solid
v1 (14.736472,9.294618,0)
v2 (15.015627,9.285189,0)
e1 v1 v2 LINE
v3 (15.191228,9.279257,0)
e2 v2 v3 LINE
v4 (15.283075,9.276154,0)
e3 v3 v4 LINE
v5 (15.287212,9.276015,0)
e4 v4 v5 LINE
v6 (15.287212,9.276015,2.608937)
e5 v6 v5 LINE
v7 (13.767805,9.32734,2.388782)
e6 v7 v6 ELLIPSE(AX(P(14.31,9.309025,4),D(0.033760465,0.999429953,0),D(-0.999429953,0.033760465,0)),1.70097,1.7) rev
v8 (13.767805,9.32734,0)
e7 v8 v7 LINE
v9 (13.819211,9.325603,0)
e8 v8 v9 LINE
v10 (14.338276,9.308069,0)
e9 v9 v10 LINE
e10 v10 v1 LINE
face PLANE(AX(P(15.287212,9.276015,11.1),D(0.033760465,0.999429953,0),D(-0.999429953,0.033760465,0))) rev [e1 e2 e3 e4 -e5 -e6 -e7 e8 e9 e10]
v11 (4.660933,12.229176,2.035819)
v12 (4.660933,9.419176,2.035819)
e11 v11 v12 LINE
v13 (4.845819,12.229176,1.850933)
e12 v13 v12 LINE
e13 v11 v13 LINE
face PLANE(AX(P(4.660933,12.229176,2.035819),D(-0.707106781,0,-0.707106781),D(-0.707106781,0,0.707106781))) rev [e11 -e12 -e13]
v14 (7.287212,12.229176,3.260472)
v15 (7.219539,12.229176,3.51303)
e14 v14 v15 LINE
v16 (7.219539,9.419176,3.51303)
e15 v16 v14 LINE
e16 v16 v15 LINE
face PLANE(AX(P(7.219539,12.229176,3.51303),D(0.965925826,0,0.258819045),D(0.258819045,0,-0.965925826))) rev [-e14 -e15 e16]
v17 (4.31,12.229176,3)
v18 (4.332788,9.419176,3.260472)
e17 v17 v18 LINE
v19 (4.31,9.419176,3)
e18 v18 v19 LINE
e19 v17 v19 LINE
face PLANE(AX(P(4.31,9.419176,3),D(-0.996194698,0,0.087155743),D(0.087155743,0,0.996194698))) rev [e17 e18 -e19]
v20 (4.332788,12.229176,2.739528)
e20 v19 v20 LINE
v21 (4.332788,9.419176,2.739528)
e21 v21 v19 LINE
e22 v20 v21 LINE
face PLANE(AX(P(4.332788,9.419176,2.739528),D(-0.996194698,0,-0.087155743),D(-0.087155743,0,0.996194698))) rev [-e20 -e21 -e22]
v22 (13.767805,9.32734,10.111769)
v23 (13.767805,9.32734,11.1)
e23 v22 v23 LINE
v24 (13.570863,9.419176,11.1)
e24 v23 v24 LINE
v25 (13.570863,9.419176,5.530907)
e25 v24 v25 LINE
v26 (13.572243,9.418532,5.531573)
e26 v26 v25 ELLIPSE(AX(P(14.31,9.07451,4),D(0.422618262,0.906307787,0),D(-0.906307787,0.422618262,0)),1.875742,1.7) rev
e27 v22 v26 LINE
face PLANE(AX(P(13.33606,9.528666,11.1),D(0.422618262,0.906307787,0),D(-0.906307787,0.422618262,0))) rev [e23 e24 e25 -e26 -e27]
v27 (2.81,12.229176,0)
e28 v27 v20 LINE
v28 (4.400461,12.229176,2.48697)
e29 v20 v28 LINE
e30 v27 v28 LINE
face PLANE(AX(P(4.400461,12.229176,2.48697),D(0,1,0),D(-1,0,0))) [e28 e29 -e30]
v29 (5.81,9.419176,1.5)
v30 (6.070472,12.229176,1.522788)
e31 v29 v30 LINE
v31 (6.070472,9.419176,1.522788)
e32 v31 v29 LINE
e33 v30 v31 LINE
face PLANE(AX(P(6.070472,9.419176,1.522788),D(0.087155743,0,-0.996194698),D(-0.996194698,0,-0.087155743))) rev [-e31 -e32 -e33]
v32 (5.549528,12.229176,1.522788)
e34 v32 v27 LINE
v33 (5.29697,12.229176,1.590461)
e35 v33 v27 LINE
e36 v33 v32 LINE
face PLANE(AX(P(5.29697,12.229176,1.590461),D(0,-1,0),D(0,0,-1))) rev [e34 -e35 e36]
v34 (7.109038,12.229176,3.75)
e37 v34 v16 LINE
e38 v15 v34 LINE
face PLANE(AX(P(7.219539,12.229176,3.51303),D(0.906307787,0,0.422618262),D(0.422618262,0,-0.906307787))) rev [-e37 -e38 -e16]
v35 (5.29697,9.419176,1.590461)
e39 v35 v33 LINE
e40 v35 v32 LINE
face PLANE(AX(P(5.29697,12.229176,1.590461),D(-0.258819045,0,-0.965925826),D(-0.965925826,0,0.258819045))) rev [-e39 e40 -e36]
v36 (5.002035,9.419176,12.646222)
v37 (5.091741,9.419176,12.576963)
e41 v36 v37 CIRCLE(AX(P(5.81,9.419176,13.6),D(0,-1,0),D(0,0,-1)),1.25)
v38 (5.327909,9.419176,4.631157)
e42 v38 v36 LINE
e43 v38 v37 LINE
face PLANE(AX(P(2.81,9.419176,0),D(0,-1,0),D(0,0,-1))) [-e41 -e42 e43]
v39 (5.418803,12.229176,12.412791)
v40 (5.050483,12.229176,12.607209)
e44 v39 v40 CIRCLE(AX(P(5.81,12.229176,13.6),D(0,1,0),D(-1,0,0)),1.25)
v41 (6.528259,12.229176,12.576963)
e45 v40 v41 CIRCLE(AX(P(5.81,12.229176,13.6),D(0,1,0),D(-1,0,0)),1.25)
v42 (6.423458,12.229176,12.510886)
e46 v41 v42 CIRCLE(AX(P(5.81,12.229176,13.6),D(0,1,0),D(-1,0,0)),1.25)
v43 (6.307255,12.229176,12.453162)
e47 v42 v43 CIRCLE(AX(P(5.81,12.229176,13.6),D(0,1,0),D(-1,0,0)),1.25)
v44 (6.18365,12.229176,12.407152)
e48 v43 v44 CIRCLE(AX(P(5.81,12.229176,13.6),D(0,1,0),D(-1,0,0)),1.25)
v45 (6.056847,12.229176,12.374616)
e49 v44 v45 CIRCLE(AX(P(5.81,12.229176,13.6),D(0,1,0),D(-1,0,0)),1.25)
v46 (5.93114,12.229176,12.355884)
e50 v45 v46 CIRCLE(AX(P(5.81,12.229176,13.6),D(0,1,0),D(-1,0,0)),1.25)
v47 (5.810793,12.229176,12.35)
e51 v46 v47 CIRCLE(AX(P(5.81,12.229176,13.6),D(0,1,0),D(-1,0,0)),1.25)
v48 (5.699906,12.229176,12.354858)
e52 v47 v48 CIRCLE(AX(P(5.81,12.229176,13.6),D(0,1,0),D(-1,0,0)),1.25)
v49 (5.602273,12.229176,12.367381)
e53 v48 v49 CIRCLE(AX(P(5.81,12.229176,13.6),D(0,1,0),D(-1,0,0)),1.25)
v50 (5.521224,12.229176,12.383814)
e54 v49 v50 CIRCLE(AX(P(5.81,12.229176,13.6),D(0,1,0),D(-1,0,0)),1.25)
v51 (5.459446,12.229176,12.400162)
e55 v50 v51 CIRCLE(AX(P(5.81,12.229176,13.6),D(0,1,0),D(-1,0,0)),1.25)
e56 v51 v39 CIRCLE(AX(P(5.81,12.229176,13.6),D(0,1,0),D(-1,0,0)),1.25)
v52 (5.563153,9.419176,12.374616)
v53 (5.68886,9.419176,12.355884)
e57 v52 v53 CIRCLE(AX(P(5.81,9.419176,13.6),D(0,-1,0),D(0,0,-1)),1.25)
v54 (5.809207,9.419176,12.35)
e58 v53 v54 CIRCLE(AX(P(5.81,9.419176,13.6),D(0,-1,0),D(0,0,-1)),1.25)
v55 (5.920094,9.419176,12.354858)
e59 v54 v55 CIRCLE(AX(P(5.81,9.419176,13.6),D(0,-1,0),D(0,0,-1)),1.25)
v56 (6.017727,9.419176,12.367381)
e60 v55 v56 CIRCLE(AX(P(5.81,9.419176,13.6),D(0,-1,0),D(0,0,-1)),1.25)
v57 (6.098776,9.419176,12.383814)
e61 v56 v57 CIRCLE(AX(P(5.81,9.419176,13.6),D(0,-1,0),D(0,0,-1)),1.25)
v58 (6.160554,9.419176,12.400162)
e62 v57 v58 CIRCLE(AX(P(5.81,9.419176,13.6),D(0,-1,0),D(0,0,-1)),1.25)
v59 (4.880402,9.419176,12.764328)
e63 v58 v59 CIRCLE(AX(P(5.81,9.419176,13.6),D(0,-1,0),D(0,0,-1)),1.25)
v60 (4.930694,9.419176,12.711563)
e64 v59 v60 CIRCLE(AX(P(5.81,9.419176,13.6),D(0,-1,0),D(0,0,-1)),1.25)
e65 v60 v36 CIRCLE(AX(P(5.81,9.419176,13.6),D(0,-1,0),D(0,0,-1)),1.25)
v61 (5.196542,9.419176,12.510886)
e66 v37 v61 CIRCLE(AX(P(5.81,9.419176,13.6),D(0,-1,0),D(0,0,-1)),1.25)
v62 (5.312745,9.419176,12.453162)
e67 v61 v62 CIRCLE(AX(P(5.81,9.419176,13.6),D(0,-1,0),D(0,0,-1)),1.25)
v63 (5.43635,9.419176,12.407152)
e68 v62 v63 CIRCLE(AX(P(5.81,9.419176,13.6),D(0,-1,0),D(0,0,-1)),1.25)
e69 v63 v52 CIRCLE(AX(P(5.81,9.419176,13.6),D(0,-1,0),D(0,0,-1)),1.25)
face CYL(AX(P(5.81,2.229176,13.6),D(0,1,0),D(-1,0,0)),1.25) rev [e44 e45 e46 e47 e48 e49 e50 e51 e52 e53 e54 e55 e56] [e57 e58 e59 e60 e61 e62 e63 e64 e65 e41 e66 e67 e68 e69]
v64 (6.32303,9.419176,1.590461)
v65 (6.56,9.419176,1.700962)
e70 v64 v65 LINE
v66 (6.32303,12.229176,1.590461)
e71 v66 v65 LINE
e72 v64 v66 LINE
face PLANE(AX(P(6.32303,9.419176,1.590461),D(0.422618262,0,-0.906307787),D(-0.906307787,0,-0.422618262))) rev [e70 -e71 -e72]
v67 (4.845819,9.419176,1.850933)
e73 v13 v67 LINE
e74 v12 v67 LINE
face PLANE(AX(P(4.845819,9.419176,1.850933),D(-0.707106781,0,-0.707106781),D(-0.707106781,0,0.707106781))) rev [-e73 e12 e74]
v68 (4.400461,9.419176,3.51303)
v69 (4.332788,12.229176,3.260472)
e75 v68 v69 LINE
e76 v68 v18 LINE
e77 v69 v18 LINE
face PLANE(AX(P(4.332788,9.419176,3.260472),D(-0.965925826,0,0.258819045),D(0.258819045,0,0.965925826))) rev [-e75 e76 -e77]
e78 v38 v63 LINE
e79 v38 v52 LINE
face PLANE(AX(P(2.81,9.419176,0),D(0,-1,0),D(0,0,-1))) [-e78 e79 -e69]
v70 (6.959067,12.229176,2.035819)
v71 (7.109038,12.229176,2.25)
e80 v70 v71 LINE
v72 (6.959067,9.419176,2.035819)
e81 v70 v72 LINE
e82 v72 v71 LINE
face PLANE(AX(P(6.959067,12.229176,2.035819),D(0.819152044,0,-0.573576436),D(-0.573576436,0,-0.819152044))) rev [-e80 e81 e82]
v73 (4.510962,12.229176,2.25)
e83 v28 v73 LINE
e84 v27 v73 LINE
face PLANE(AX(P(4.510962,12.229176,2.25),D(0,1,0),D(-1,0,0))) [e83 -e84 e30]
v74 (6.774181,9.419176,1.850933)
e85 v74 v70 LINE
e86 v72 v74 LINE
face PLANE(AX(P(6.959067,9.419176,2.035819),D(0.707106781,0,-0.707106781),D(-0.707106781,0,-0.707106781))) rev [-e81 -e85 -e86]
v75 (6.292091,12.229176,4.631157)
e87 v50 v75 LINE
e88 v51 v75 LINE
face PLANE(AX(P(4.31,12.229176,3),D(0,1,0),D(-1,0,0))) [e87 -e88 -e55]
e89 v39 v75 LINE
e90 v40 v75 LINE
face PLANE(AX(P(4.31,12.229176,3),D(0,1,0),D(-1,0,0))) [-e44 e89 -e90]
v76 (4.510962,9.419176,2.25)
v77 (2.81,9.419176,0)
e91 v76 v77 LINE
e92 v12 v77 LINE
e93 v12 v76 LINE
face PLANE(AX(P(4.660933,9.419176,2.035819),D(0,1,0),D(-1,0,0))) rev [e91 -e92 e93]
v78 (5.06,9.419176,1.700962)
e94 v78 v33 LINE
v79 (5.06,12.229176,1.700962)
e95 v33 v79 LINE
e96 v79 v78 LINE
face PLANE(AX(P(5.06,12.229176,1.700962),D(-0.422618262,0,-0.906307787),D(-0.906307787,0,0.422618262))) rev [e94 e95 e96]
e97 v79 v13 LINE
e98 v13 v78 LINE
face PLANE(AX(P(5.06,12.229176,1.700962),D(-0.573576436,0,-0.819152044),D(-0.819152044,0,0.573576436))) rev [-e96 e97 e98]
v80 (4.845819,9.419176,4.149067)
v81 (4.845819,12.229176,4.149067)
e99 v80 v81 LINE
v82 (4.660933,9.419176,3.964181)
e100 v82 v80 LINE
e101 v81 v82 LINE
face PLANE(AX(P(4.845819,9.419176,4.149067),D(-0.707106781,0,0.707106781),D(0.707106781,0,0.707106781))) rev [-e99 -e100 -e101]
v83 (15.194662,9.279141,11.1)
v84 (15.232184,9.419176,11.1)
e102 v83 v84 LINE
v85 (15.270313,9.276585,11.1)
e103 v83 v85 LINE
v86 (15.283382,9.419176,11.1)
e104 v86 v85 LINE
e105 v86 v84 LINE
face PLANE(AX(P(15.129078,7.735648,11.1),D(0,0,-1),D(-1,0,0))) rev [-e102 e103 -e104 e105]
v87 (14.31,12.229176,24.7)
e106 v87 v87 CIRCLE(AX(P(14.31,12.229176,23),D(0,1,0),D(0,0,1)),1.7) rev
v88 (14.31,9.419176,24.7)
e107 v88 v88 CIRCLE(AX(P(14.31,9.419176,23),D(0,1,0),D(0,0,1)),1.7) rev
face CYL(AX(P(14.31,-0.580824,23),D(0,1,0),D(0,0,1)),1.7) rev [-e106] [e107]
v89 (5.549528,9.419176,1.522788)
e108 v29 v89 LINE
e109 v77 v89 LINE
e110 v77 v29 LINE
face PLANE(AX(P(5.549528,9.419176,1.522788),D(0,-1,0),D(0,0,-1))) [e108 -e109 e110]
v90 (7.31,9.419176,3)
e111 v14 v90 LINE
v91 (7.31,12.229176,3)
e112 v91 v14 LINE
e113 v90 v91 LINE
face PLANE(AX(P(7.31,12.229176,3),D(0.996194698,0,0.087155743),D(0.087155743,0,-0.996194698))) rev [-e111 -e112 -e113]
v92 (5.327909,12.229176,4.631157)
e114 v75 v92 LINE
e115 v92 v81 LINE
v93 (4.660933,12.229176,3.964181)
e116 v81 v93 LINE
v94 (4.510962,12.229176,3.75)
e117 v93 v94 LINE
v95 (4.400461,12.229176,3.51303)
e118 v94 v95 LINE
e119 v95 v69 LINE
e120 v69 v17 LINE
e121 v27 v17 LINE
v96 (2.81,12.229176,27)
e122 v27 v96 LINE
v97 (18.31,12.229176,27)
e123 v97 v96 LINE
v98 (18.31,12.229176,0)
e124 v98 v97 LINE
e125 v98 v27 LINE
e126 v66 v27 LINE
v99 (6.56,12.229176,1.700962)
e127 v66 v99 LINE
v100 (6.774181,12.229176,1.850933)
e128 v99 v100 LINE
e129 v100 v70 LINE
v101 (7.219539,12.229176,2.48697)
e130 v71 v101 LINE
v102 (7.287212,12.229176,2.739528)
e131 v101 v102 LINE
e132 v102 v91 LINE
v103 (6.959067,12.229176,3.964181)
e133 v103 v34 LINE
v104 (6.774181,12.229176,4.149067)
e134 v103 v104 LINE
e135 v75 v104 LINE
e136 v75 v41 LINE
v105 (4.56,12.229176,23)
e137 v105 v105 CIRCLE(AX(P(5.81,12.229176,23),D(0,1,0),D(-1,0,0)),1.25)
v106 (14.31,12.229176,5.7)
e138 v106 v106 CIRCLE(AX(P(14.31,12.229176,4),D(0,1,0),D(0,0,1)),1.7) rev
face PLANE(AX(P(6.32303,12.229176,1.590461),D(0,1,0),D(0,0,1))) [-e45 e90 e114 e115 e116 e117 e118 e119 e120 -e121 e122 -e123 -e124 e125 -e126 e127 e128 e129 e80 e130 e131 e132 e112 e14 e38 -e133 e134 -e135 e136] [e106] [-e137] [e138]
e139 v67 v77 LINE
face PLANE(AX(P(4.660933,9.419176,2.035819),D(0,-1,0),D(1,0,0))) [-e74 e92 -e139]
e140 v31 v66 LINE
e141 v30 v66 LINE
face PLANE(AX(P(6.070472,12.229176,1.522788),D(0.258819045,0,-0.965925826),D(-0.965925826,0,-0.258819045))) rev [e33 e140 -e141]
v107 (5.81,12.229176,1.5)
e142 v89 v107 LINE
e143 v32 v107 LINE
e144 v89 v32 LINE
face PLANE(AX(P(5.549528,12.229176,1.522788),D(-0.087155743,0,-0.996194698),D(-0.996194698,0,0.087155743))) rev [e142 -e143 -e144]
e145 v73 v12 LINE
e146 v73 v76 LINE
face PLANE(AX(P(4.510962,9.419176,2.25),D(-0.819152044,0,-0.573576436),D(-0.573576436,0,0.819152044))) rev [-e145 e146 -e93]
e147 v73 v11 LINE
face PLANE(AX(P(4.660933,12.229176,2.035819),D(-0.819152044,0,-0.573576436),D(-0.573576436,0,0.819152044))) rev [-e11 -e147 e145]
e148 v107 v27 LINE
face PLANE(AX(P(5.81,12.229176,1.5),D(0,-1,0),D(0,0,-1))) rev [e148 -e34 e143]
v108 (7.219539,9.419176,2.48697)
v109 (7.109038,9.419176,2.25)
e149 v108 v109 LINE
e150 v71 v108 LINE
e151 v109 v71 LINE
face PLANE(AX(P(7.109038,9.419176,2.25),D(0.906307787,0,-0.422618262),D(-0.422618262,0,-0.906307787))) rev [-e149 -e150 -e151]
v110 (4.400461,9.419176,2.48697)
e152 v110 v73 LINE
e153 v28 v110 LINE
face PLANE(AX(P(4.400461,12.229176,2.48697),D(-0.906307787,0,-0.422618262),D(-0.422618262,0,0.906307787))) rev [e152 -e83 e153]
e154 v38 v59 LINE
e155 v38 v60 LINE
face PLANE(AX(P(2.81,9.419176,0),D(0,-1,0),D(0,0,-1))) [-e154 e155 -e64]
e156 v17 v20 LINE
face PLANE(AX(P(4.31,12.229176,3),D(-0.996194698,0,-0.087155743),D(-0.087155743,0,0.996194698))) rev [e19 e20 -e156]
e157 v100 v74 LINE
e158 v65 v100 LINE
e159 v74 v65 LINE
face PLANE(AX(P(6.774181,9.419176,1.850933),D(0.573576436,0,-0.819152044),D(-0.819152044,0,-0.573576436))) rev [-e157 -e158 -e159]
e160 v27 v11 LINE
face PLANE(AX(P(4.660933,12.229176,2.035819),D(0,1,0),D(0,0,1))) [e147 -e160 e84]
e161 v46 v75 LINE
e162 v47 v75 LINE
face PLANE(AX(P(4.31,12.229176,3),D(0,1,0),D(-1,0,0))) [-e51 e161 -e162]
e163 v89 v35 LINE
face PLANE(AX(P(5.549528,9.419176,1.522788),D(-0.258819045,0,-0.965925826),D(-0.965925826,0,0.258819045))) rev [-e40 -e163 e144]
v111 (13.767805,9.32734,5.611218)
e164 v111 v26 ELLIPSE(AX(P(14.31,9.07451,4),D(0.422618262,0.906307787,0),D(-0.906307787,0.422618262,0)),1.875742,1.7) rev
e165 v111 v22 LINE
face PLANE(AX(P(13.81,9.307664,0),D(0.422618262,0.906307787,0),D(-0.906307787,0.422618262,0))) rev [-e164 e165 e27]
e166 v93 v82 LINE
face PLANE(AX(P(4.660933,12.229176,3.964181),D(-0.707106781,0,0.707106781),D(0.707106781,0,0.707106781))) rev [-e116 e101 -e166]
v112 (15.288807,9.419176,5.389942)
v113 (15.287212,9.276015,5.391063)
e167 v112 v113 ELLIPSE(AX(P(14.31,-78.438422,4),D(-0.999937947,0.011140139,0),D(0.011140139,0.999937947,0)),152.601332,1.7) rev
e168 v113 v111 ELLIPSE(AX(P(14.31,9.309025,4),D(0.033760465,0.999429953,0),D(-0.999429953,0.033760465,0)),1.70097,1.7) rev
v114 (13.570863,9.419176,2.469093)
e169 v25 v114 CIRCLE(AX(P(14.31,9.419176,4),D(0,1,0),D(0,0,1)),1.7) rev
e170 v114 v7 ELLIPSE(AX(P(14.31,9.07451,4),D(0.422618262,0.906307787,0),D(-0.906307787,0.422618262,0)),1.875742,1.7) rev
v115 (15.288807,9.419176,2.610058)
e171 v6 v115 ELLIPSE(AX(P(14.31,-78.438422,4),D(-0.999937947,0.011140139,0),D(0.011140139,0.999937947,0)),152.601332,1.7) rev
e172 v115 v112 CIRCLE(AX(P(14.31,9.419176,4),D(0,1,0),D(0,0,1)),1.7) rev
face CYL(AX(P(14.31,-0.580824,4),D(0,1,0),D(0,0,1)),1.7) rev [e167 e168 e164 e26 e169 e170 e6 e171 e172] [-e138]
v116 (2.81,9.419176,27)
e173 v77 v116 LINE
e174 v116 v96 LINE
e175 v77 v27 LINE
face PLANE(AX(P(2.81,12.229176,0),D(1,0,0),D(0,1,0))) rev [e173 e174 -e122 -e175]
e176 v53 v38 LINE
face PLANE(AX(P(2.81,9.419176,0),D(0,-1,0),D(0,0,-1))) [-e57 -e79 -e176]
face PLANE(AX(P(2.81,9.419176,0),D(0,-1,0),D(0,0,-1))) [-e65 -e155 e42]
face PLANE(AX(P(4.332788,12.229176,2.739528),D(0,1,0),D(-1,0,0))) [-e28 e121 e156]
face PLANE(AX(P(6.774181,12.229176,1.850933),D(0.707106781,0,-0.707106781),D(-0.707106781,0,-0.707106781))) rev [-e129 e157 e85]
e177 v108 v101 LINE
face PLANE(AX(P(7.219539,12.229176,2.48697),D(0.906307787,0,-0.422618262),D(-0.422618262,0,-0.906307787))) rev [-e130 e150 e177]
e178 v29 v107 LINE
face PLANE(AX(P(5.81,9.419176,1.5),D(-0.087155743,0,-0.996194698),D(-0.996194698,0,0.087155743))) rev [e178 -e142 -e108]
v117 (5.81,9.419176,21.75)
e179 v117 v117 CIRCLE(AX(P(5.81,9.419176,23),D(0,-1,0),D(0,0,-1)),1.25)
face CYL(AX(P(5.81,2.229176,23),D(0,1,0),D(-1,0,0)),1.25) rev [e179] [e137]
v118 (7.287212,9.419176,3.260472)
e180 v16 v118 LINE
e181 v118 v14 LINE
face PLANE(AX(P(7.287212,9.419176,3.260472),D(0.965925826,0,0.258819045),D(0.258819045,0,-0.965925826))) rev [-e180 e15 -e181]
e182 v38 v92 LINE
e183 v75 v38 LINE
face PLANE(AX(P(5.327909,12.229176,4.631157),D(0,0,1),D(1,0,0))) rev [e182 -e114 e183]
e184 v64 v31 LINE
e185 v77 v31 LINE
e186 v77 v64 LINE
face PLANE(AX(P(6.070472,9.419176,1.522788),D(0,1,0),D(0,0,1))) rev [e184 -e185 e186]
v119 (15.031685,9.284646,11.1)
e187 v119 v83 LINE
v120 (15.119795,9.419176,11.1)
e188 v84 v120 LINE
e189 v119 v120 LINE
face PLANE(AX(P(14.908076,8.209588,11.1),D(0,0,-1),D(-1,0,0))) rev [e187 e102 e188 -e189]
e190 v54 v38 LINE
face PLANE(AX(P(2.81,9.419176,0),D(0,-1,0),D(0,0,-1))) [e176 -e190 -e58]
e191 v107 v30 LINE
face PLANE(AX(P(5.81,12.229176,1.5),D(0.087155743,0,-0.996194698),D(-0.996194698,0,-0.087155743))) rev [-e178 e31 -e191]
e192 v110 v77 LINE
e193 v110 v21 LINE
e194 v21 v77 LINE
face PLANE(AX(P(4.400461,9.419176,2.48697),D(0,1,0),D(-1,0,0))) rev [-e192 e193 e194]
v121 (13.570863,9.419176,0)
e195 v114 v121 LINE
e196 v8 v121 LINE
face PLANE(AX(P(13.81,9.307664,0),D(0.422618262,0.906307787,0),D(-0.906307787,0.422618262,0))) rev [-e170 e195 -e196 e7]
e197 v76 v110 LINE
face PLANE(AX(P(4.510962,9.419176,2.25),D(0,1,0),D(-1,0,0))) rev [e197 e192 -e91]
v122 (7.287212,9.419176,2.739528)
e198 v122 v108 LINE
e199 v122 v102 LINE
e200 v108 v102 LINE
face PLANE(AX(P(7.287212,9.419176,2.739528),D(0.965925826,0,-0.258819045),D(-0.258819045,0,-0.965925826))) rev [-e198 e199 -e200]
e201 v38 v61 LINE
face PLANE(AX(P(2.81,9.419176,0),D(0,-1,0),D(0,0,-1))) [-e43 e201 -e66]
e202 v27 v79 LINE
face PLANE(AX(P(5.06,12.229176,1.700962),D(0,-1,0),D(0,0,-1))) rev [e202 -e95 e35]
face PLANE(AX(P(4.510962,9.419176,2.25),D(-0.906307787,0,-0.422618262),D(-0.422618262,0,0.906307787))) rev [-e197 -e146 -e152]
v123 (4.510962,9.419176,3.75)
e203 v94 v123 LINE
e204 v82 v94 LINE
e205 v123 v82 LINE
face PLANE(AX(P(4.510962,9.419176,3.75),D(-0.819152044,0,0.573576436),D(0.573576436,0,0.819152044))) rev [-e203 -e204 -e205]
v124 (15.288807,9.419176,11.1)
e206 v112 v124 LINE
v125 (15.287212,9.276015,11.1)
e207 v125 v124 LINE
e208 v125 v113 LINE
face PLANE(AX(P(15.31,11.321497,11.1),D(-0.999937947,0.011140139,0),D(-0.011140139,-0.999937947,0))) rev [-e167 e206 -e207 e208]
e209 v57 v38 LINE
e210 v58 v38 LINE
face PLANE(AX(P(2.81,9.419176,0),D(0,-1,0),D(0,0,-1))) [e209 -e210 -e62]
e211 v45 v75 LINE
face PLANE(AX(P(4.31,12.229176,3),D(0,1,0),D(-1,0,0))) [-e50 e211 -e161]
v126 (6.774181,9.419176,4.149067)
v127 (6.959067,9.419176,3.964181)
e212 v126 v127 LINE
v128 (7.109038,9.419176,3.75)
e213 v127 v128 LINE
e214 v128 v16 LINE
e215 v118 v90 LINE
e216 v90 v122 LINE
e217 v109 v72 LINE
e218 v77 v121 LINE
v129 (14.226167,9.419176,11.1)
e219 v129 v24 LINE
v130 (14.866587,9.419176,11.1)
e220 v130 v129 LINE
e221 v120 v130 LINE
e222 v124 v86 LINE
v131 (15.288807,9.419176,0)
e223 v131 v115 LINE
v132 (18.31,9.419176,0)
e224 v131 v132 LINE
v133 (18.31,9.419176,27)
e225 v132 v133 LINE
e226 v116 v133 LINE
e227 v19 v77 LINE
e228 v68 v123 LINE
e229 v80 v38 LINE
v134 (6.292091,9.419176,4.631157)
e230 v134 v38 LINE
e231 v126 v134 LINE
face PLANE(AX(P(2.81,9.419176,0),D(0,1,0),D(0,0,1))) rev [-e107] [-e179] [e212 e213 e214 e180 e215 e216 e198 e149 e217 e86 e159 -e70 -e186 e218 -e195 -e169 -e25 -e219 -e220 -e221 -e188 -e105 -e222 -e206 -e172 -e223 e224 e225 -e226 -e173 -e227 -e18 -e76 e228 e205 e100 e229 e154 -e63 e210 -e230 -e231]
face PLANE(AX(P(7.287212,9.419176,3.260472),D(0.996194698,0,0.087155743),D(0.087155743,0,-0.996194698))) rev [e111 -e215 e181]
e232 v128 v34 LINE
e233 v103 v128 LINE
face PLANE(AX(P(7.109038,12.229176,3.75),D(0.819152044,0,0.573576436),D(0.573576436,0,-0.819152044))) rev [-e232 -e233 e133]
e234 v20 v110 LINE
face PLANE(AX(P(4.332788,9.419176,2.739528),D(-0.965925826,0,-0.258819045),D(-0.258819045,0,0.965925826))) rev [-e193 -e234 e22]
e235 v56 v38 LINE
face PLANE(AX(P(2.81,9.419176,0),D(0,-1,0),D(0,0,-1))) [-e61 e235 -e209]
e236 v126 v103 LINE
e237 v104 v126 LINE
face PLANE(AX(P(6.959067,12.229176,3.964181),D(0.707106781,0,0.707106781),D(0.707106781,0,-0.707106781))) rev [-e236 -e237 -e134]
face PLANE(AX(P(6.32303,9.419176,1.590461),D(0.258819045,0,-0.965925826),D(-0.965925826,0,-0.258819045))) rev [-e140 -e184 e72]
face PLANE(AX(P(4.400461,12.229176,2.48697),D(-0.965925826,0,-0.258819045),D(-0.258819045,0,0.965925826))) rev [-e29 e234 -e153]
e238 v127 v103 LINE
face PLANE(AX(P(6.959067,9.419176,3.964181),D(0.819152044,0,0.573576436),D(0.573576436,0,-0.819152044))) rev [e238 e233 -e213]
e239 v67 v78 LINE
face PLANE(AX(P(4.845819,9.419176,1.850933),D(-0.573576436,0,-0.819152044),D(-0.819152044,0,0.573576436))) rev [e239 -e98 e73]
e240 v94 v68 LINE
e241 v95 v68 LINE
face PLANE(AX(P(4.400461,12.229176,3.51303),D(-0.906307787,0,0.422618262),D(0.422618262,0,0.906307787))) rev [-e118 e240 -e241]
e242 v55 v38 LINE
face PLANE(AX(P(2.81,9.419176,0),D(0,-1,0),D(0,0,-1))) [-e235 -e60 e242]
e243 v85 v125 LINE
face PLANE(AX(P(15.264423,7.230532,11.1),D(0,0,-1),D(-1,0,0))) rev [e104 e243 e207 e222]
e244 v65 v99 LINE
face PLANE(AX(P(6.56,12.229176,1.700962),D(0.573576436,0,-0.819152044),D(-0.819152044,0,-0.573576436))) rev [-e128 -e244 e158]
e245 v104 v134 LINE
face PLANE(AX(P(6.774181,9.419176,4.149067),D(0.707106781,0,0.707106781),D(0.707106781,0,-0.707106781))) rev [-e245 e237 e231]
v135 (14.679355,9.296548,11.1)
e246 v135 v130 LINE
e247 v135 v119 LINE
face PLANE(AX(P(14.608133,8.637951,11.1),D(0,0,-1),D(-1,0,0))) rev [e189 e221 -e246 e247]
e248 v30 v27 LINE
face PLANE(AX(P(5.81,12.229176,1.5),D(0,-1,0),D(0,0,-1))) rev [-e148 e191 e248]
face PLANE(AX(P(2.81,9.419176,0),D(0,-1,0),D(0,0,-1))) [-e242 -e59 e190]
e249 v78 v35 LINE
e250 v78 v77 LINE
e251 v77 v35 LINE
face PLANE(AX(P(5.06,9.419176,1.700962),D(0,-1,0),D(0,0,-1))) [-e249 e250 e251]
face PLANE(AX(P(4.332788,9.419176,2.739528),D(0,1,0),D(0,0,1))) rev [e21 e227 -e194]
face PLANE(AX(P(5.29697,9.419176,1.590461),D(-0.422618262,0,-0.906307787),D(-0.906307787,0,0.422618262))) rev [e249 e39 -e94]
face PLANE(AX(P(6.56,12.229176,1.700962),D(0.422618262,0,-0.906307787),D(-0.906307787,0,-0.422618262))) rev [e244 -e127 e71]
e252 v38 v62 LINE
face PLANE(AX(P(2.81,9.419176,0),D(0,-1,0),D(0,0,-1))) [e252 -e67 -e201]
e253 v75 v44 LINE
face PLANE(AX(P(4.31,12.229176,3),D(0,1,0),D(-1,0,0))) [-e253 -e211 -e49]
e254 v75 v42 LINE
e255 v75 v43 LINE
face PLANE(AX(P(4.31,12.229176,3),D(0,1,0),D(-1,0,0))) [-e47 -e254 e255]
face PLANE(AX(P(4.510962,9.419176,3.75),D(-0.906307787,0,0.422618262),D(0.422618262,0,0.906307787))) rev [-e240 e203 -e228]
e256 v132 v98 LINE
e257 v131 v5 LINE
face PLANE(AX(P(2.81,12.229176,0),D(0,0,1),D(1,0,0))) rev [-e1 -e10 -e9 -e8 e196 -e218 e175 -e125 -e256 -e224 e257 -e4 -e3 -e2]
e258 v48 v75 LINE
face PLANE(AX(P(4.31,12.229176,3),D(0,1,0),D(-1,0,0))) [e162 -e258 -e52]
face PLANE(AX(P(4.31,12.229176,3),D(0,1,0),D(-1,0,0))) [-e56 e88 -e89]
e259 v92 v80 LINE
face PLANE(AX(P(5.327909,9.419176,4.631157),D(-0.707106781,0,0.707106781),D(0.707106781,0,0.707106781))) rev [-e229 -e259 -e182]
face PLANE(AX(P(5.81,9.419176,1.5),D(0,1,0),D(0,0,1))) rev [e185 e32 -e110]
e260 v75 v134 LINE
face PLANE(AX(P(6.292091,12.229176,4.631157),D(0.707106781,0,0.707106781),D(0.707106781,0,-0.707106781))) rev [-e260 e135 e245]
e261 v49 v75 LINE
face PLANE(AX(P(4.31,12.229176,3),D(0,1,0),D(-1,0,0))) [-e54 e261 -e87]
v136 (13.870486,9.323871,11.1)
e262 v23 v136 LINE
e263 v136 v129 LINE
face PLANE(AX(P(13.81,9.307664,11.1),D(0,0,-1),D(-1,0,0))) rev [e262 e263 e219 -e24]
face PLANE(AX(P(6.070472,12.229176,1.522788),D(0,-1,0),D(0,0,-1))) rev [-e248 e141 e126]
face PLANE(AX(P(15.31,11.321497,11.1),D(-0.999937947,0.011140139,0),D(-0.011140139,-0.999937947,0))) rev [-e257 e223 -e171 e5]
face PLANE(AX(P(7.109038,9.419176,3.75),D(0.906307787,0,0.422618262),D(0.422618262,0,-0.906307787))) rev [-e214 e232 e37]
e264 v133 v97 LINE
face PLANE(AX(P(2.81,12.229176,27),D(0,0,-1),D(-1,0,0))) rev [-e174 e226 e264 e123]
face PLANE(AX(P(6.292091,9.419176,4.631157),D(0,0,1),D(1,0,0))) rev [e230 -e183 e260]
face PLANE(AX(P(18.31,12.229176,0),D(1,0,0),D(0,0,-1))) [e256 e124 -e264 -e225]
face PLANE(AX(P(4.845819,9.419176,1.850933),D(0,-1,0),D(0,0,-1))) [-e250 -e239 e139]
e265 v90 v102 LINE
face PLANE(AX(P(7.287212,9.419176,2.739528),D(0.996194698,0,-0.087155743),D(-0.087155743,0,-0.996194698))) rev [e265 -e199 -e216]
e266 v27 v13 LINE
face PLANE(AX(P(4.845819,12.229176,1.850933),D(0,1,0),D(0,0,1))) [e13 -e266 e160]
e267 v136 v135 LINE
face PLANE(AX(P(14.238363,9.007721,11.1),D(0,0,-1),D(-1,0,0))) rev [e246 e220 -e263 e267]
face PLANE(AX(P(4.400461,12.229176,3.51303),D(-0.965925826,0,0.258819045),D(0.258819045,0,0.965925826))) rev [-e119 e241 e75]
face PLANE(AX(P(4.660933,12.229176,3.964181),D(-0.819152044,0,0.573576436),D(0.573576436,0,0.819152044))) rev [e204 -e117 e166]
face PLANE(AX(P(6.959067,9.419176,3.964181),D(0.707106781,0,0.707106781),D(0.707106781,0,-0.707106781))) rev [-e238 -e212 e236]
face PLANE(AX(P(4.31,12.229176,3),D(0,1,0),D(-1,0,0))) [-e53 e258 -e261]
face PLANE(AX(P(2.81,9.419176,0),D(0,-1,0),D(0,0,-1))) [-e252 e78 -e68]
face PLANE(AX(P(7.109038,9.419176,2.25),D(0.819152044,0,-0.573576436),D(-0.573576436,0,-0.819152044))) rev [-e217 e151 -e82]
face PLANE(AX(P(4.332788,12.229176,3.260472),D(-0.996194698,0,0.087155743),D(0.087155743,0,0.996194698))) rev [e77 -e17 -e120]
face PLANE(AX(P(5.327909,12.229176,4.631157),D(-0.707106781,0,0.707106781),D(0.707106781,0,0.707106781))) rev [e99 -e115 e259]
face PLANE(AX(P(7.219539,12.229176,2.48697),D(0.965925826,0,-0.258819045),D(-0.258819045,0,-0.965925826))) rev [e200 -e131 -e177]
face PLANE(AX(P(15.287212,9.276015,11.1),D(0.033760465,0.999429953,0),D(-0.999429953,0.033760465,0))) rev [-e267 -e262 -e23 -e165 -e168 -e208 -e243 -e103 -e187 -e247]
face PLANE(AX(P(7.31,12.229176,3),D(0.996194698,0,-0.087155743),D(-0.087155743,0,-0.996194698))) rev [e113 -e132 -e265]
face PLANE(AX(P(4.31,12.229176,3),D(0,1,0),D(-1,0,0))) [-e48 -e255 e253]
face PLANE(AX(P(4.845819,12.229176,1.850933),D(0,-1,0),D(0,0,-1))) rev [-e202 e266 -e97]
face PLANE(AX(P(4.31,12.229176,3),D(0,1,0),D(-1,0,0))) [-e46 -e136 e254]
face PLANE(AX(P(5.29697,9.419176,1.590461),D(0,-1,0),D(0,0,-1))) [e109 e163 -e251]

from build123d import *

# Parameters (mm, degrees)
RESSALTO_EXTRUS_O1_START   = -2.81
RESSALTO_EXTRUS_O1_DEPTH   = 2.81
RESSALTO_EXTRUS_O1_START_2 = -11.039175584
RESSALTO_EXTRUS_O1_2_DEPTH = 8.229175584
RESSALTO_EXTRUS_O1_3_DEPTH = 2.81
RESSALTO_EXTRUS_O1_START_3 = -12.229175584
RESSALTO_EXTRUS_O1_4_DEPTH = 1.19
RESSALTO_EXTRUS_O1_START_4 = -10.229175584
RESSALTO_EXTRUS_O1_5_DEPTH = 2
RESSALTO_EXTRUS_O1_6_DEPTH = 11.1
RESSALTO_EXTRUS_O1_7_DEPTH = 13.5
RESSALTO_EXTRUS_O1_START_5 = 11.1
RESSALTO_EXTRUS_O1_8_DEPTH = 2.4
ESBO_O2_R                  = 1.25
CORTE_EXTRUS_O1_DEPTH      = 10
CORTE_EXTRUS_O2_DEPTH      = 11.1
ESBO_O4_W                  = 7.32569207
ESBO_O4_H                  = 2.81
RESSALTO_EXTRUS_O2_DEPTH   = 27
CORTE_EXTRUS_O3_DEPTH      = 10
CORTE_EXTRUS_O3_DEPTH_BACK = 10
ESBO_O5_R                  = 1.7


with BuildPart() as part:
    # Ressalto-extrusão1: read off the stored shape, not the designer's step
    # Ressalto-extrusão1 outline → Ressalto-extrusão1 (new body)
    with BuildSketch(Plane(origin=(0, 12.229175584, 0), x_dir=(1, 0, 0), z_dir=(0, 1, 0)).offset(RESSALTO_EXTRUS_O1_START)):
        Polygon((2.81, -27), (15.31, -27), (15.31, -13.5), (15.31, 0), (2.81, 0), align=None)
        Polygon((4.510961894, -3.75), (4.400461069, -3.513030215), (4.33278837, -3.260472267), (4.31, -3), (4.33278837, -2.739527733), (4.400461069, -2.486969785), (4.510961894, -2.25), (4.660933335, -2.035818585), (4.845818585, -1.850933335), (5.06, -1.700961894), (5.296969785, -1.590461069), (5.549527734, -1.52278837), (5.81, -1.5), (6.070472267, -1.52278837), (6.323030215, -1.590461069), (6.56, -1.700961894), (6.774181415, -1.850933335), (6.959066665, -2.035818585), (7.109038106, -2.25), (7.219538931, -2.486969785), (7.28721163, -2.739527733), (7.31, -3), (7.28721163, -3.260472267), (7.219538931, -3.513030215), (7.109038106, -3.75), (6.959066665, -3.964181415), (6.774181415, -4.149066665), (6.292090707, -4.631157372), (5.327909293, -4.631157372), (4.660933335, -3.964181415), align=None, mode=Mode.SUBTRACT)
    extrude(amount=RESSALTO_EXTRUS_O1_DEPTH)

    # Ressalto-extrus_o1 2 outline → Ressalto-extrus_o1 2 (add)
    with BuildSketch(Plane(origin=(0, 12.229175584, 0), x_dir=(1, 0, 0), z_dir=(0, 1, 0)).offset(RESSALTO_EXTRUS_O1_START_2)):
        Polygon((3.005299462, -7.857883832), (2.81, -7.519615241), (2.81, -11.1), (15.31, -11.1), (15.31, 0), (9.687350269, 0), (11.419401077, -3), (8.614700538, -7.857883832), align=None)
    extrude(amount=RESSALTO_EXTRUS_O1_2_DEPTH)

    # Ressalto-extrus_o1 3 outline → Ressalto-extrus_o1 3 (add)
    with BuildSketch(Plane(origin=(0, 12.229175584, 0), x_dir=(1, 0, 0), z_dir=(0, 1, 0)).offset(RESSALTO_EXTRUS_O1_START_2)):
        Polygon((2.51, -3), (4.242050808, 0), (0, 0), (0, -11.1), (2.81, -11.1), (2.81, -7.519615241), (3.005299462, -7.857883832), (8.614700538, -7.857883832), (11.419401077, -3), (9.687350269, 0), (7.377949192, 0), (9.11, -3), (7.46, -5.857883832), (4.16, -5.857883832), align=None)
    extrude(amount=RESSALTO_EXTRUS_O1_3_DEPTH)

    # Ressalto-extrus_o1 4 outline → Ressalto-extrus_o1 4 (add)
    with BuildSketch(Plane(origin=(0, 12.229175584, 0), x_dir=(1, 0, 0), z_dir=(0, 1, 0)).offset(RESSALTO_EXTRUS_O1_START_3)):
        Polygon((2.51, -3), (4.242050808, 0), (1.932649731, 0), (0.200598923, -3), (3.005299462, -7.857883832), (8.614700538, -7.857883832), (11.419401077, -3), (9.687350269, 0), (7.377949192, 0), (9.11, -3), (7.46, -5.857883832), (4.16, -5.857883832), align=None)
    extrude(amount=RESSALTO_EXTRUS_O1_4_DEPTH)

    # Ressalto-extrus_o1 5 outline → Ressalto-extrus_o1 5 (add)
    with BuildSketch(Plane(origin=(0, 12.229175584, 0), x_dir=(1, 0, 0), z_dir=(0, 1, 0)).offset(RESSALTO_EXTRUS_O1_START_4)):
        Polygon((2.51, -3), (4.16, -5.857883832), (7.46, -5.857883832), (9.11, -3), (7.377949192, 0), (4.242050808, 0), align=None)
        Polygon((4.400461069, -3.513030215), (4.33278837, -3.260472267), (4.31, -3), (4.33278837, -2.739527733), (4.400461069, -2.486969785), (4.510961894, -2.25), (4.660933335, -2.035818585), (4.845818585, -1.850933335), (5.06, -1.700961894), (5.296969785, -1.590461069), (5.549527734, -1.52278837), (5.81, -1.5), (6.070472267, -1.52278837), (6.323030215, -1.590461069), (6.56, -1.700961894), (6.774181415, -1.850933335), (6.959066665, -2.035818585), (7.109038106, -2.25), (7.219538931, -2.486969785), (7.28721163, -2.739527733), (7.31, -3), (7.28721163, -3.260472267), (7.219538931, -3.513030215), (7.109038106, -3.75), (6.959066665, -3.964181415), (6.774181415, -4.149066665), (6.292090707, -4.631157372), (5.327909293, -4.631157372), (4.660933335, -3.964181415), (4.510961894, -3.75), align=None, mode=Mode.SUBTRACT)
    extrude(amount=RESSALTO_EXTRUS_O1_5_DEPTH)

    # Ressalto-extrus_o1 6 outline → Ressalto-extrus_o1 6 (add)
    with BuildSketch(Plane.XY):
        Polygon((17.745732851, 5.751121431), (17.829587792, 6.709587792), (17.745732851, 7.668054154), (17.496715918, 8.597398), (17.090103246, 9.469381688), (16.538249557, 10.257510436), (15.857922643, 10.937837349), (15.31, 11.321496914), (15.31, 2.097678671), (15.857922643, 2.481338236), (16.538249557, 3.161665149), (17.090103246, 3.949793896), (17.496715918, 4.821777584), align=None)
    extrude(amount=RESSALTO_EXTRUS_O1_6_DEPTH)

    # Ressalto-extrus_o1 7 outline → Ressalto-extrus_o1 7 (cut)
    with BuildSketch(Plane.XY):
        Polygon((15.31, 1.19), (15.31, 2.097678671), (15.069793896, 1.929484546), (13.96, 1.19), align=None)
        Polygon((15.264423259, 6.188643259), (15.31, 6.709587792), (15.264423259, 7.230532325), (15.129077862, 7.735648222), (14.908076211, 8.209587792), (14.608133329, 8.637950621), (14.238362829, 9.007721122), (13.81, 9.307664004), (13.33606043, 9.528665655), (12.830944533, 9.664011051), (12.378861267, 9.703563212), (12.368467114, 9.704472583), (12.31, 9.709587792), (12.049527733, 9.686799421), (11.789055467, 9.664011051), (11.536497519, 9.596338353), (11.28393957, 9.528665655), (11.166538463, 9.473920619), (11.049137357, 9.419175584), (2.81, 9.419175584), (2.81, 4), (11.049137357, 4), (11.28393957, 3.89050993), (11.789055467, 3.755164533), (12.31, 3.709587792), (12.830944533, 3.755164533), (13.33606043, 3.89050993), (13.81, 4.111511581), (14.238362829, 4.411454463), (14.608133329, 4.781224963), (14.908076211, 5.209587792), (15.129077862, 5.683527362), align=None)
    extrude(amount=RESSALTO_EXTRUS_O1_7_DEPTH, mode=Mode.SUBTRACT)

    # Ressalto-extrus_o1 8 outline → Ressalto-extrus_o1 8 (cut)
    with BuildSketch(Plane.XY.offset(RESSALTO_EXTRUS_O1_START_5)):
        Polygon((15.31, 9.419175584), (15.31, 9.709587792), (12.378861267, 9.703563212), (12.830944533, 9.664011051), (13.33606043, 9.528665655), (13.570862645, 9.419175584), align=None)
    extrude(amount=RESSALTO_EXTRUS_O1_8_DEPTH, mode=Mode.SUBTRACT)

    # Esboço2 → Corte-extrusão1 (cut)
    with BuildSketch(Plane(origin=(0, 12.229175584, 0), x_dir=(1, 0, 0), z_dir=(0, 1, 0))):
        with Locations(Location((5.81, -13.6, 0), (0, 0, 138.045690322))):
            Circle(ESBO_O2_R)
        with Locations(Location((5.81, -23, 0), (0, 0, 180))):
            Circle(ESBO_O2_R)
    extrude(amount=-CORTE_EXTRUS_O1_DEPTH, mode=Mode.SUBTRACT)

    # Esboço3 → Corte-extrusão2 (cut)
    with BuildSketch(Plane(origin=(0, 0, 0), x_dir=(-1, 0, 0), z_dir=(0, 0, -1))):
        Polygon((-15.31, 11.321496914), (-15.28721163, 9.27601462), (-11.049137357, 9.419175584), (-11.049137357, 5.796906152), (1.171598193, 5.796906152), (1.171598193, -2.184845068), (-19.517418651, -2.184845068), (-19.517418651, 11.321496914), align=None)
    extrude(amount=-CORTE_EXTRUS_O2_DEPTH, mode=Mode.SUBTRACT)

    # Esboço4 → Ressalto-extrusão2 (add)
    with BuildSketch(Plane.XY.offset(27)):
        with Locations((14.647153965, 10.824175584)):
            Rectangle(ESBO_O4_W, ESBO_O4_H)
    extrude(amount=-RESSALTO_EXTRUS_O2_DEPTH)

    # Esboço5 → Corte-extrusão3 (cut, two sides: drawn at the far end of the back side and taken through both)
    with BuildSketch(Plane.XZ.offset(-9.419175584).offset(-CORTE_EXTRUS_O3_DEPTH_BACK)):
        with Locations(Location((14.31, 23, 0), (0, 0, 90))):
            Circle(ESBO_O5_R)
        with Locations(Location((14.31, 4, 0), (0, 0, 90))):
            Circle(ESBO_O5_R)
    extrude(amount=CORTE_EXTRUS_O3_DEPTH + CORTE_EXTRUS_O3_DEPTH_BACK, mode=Mode.SUBTRACT)


solid = part.part
